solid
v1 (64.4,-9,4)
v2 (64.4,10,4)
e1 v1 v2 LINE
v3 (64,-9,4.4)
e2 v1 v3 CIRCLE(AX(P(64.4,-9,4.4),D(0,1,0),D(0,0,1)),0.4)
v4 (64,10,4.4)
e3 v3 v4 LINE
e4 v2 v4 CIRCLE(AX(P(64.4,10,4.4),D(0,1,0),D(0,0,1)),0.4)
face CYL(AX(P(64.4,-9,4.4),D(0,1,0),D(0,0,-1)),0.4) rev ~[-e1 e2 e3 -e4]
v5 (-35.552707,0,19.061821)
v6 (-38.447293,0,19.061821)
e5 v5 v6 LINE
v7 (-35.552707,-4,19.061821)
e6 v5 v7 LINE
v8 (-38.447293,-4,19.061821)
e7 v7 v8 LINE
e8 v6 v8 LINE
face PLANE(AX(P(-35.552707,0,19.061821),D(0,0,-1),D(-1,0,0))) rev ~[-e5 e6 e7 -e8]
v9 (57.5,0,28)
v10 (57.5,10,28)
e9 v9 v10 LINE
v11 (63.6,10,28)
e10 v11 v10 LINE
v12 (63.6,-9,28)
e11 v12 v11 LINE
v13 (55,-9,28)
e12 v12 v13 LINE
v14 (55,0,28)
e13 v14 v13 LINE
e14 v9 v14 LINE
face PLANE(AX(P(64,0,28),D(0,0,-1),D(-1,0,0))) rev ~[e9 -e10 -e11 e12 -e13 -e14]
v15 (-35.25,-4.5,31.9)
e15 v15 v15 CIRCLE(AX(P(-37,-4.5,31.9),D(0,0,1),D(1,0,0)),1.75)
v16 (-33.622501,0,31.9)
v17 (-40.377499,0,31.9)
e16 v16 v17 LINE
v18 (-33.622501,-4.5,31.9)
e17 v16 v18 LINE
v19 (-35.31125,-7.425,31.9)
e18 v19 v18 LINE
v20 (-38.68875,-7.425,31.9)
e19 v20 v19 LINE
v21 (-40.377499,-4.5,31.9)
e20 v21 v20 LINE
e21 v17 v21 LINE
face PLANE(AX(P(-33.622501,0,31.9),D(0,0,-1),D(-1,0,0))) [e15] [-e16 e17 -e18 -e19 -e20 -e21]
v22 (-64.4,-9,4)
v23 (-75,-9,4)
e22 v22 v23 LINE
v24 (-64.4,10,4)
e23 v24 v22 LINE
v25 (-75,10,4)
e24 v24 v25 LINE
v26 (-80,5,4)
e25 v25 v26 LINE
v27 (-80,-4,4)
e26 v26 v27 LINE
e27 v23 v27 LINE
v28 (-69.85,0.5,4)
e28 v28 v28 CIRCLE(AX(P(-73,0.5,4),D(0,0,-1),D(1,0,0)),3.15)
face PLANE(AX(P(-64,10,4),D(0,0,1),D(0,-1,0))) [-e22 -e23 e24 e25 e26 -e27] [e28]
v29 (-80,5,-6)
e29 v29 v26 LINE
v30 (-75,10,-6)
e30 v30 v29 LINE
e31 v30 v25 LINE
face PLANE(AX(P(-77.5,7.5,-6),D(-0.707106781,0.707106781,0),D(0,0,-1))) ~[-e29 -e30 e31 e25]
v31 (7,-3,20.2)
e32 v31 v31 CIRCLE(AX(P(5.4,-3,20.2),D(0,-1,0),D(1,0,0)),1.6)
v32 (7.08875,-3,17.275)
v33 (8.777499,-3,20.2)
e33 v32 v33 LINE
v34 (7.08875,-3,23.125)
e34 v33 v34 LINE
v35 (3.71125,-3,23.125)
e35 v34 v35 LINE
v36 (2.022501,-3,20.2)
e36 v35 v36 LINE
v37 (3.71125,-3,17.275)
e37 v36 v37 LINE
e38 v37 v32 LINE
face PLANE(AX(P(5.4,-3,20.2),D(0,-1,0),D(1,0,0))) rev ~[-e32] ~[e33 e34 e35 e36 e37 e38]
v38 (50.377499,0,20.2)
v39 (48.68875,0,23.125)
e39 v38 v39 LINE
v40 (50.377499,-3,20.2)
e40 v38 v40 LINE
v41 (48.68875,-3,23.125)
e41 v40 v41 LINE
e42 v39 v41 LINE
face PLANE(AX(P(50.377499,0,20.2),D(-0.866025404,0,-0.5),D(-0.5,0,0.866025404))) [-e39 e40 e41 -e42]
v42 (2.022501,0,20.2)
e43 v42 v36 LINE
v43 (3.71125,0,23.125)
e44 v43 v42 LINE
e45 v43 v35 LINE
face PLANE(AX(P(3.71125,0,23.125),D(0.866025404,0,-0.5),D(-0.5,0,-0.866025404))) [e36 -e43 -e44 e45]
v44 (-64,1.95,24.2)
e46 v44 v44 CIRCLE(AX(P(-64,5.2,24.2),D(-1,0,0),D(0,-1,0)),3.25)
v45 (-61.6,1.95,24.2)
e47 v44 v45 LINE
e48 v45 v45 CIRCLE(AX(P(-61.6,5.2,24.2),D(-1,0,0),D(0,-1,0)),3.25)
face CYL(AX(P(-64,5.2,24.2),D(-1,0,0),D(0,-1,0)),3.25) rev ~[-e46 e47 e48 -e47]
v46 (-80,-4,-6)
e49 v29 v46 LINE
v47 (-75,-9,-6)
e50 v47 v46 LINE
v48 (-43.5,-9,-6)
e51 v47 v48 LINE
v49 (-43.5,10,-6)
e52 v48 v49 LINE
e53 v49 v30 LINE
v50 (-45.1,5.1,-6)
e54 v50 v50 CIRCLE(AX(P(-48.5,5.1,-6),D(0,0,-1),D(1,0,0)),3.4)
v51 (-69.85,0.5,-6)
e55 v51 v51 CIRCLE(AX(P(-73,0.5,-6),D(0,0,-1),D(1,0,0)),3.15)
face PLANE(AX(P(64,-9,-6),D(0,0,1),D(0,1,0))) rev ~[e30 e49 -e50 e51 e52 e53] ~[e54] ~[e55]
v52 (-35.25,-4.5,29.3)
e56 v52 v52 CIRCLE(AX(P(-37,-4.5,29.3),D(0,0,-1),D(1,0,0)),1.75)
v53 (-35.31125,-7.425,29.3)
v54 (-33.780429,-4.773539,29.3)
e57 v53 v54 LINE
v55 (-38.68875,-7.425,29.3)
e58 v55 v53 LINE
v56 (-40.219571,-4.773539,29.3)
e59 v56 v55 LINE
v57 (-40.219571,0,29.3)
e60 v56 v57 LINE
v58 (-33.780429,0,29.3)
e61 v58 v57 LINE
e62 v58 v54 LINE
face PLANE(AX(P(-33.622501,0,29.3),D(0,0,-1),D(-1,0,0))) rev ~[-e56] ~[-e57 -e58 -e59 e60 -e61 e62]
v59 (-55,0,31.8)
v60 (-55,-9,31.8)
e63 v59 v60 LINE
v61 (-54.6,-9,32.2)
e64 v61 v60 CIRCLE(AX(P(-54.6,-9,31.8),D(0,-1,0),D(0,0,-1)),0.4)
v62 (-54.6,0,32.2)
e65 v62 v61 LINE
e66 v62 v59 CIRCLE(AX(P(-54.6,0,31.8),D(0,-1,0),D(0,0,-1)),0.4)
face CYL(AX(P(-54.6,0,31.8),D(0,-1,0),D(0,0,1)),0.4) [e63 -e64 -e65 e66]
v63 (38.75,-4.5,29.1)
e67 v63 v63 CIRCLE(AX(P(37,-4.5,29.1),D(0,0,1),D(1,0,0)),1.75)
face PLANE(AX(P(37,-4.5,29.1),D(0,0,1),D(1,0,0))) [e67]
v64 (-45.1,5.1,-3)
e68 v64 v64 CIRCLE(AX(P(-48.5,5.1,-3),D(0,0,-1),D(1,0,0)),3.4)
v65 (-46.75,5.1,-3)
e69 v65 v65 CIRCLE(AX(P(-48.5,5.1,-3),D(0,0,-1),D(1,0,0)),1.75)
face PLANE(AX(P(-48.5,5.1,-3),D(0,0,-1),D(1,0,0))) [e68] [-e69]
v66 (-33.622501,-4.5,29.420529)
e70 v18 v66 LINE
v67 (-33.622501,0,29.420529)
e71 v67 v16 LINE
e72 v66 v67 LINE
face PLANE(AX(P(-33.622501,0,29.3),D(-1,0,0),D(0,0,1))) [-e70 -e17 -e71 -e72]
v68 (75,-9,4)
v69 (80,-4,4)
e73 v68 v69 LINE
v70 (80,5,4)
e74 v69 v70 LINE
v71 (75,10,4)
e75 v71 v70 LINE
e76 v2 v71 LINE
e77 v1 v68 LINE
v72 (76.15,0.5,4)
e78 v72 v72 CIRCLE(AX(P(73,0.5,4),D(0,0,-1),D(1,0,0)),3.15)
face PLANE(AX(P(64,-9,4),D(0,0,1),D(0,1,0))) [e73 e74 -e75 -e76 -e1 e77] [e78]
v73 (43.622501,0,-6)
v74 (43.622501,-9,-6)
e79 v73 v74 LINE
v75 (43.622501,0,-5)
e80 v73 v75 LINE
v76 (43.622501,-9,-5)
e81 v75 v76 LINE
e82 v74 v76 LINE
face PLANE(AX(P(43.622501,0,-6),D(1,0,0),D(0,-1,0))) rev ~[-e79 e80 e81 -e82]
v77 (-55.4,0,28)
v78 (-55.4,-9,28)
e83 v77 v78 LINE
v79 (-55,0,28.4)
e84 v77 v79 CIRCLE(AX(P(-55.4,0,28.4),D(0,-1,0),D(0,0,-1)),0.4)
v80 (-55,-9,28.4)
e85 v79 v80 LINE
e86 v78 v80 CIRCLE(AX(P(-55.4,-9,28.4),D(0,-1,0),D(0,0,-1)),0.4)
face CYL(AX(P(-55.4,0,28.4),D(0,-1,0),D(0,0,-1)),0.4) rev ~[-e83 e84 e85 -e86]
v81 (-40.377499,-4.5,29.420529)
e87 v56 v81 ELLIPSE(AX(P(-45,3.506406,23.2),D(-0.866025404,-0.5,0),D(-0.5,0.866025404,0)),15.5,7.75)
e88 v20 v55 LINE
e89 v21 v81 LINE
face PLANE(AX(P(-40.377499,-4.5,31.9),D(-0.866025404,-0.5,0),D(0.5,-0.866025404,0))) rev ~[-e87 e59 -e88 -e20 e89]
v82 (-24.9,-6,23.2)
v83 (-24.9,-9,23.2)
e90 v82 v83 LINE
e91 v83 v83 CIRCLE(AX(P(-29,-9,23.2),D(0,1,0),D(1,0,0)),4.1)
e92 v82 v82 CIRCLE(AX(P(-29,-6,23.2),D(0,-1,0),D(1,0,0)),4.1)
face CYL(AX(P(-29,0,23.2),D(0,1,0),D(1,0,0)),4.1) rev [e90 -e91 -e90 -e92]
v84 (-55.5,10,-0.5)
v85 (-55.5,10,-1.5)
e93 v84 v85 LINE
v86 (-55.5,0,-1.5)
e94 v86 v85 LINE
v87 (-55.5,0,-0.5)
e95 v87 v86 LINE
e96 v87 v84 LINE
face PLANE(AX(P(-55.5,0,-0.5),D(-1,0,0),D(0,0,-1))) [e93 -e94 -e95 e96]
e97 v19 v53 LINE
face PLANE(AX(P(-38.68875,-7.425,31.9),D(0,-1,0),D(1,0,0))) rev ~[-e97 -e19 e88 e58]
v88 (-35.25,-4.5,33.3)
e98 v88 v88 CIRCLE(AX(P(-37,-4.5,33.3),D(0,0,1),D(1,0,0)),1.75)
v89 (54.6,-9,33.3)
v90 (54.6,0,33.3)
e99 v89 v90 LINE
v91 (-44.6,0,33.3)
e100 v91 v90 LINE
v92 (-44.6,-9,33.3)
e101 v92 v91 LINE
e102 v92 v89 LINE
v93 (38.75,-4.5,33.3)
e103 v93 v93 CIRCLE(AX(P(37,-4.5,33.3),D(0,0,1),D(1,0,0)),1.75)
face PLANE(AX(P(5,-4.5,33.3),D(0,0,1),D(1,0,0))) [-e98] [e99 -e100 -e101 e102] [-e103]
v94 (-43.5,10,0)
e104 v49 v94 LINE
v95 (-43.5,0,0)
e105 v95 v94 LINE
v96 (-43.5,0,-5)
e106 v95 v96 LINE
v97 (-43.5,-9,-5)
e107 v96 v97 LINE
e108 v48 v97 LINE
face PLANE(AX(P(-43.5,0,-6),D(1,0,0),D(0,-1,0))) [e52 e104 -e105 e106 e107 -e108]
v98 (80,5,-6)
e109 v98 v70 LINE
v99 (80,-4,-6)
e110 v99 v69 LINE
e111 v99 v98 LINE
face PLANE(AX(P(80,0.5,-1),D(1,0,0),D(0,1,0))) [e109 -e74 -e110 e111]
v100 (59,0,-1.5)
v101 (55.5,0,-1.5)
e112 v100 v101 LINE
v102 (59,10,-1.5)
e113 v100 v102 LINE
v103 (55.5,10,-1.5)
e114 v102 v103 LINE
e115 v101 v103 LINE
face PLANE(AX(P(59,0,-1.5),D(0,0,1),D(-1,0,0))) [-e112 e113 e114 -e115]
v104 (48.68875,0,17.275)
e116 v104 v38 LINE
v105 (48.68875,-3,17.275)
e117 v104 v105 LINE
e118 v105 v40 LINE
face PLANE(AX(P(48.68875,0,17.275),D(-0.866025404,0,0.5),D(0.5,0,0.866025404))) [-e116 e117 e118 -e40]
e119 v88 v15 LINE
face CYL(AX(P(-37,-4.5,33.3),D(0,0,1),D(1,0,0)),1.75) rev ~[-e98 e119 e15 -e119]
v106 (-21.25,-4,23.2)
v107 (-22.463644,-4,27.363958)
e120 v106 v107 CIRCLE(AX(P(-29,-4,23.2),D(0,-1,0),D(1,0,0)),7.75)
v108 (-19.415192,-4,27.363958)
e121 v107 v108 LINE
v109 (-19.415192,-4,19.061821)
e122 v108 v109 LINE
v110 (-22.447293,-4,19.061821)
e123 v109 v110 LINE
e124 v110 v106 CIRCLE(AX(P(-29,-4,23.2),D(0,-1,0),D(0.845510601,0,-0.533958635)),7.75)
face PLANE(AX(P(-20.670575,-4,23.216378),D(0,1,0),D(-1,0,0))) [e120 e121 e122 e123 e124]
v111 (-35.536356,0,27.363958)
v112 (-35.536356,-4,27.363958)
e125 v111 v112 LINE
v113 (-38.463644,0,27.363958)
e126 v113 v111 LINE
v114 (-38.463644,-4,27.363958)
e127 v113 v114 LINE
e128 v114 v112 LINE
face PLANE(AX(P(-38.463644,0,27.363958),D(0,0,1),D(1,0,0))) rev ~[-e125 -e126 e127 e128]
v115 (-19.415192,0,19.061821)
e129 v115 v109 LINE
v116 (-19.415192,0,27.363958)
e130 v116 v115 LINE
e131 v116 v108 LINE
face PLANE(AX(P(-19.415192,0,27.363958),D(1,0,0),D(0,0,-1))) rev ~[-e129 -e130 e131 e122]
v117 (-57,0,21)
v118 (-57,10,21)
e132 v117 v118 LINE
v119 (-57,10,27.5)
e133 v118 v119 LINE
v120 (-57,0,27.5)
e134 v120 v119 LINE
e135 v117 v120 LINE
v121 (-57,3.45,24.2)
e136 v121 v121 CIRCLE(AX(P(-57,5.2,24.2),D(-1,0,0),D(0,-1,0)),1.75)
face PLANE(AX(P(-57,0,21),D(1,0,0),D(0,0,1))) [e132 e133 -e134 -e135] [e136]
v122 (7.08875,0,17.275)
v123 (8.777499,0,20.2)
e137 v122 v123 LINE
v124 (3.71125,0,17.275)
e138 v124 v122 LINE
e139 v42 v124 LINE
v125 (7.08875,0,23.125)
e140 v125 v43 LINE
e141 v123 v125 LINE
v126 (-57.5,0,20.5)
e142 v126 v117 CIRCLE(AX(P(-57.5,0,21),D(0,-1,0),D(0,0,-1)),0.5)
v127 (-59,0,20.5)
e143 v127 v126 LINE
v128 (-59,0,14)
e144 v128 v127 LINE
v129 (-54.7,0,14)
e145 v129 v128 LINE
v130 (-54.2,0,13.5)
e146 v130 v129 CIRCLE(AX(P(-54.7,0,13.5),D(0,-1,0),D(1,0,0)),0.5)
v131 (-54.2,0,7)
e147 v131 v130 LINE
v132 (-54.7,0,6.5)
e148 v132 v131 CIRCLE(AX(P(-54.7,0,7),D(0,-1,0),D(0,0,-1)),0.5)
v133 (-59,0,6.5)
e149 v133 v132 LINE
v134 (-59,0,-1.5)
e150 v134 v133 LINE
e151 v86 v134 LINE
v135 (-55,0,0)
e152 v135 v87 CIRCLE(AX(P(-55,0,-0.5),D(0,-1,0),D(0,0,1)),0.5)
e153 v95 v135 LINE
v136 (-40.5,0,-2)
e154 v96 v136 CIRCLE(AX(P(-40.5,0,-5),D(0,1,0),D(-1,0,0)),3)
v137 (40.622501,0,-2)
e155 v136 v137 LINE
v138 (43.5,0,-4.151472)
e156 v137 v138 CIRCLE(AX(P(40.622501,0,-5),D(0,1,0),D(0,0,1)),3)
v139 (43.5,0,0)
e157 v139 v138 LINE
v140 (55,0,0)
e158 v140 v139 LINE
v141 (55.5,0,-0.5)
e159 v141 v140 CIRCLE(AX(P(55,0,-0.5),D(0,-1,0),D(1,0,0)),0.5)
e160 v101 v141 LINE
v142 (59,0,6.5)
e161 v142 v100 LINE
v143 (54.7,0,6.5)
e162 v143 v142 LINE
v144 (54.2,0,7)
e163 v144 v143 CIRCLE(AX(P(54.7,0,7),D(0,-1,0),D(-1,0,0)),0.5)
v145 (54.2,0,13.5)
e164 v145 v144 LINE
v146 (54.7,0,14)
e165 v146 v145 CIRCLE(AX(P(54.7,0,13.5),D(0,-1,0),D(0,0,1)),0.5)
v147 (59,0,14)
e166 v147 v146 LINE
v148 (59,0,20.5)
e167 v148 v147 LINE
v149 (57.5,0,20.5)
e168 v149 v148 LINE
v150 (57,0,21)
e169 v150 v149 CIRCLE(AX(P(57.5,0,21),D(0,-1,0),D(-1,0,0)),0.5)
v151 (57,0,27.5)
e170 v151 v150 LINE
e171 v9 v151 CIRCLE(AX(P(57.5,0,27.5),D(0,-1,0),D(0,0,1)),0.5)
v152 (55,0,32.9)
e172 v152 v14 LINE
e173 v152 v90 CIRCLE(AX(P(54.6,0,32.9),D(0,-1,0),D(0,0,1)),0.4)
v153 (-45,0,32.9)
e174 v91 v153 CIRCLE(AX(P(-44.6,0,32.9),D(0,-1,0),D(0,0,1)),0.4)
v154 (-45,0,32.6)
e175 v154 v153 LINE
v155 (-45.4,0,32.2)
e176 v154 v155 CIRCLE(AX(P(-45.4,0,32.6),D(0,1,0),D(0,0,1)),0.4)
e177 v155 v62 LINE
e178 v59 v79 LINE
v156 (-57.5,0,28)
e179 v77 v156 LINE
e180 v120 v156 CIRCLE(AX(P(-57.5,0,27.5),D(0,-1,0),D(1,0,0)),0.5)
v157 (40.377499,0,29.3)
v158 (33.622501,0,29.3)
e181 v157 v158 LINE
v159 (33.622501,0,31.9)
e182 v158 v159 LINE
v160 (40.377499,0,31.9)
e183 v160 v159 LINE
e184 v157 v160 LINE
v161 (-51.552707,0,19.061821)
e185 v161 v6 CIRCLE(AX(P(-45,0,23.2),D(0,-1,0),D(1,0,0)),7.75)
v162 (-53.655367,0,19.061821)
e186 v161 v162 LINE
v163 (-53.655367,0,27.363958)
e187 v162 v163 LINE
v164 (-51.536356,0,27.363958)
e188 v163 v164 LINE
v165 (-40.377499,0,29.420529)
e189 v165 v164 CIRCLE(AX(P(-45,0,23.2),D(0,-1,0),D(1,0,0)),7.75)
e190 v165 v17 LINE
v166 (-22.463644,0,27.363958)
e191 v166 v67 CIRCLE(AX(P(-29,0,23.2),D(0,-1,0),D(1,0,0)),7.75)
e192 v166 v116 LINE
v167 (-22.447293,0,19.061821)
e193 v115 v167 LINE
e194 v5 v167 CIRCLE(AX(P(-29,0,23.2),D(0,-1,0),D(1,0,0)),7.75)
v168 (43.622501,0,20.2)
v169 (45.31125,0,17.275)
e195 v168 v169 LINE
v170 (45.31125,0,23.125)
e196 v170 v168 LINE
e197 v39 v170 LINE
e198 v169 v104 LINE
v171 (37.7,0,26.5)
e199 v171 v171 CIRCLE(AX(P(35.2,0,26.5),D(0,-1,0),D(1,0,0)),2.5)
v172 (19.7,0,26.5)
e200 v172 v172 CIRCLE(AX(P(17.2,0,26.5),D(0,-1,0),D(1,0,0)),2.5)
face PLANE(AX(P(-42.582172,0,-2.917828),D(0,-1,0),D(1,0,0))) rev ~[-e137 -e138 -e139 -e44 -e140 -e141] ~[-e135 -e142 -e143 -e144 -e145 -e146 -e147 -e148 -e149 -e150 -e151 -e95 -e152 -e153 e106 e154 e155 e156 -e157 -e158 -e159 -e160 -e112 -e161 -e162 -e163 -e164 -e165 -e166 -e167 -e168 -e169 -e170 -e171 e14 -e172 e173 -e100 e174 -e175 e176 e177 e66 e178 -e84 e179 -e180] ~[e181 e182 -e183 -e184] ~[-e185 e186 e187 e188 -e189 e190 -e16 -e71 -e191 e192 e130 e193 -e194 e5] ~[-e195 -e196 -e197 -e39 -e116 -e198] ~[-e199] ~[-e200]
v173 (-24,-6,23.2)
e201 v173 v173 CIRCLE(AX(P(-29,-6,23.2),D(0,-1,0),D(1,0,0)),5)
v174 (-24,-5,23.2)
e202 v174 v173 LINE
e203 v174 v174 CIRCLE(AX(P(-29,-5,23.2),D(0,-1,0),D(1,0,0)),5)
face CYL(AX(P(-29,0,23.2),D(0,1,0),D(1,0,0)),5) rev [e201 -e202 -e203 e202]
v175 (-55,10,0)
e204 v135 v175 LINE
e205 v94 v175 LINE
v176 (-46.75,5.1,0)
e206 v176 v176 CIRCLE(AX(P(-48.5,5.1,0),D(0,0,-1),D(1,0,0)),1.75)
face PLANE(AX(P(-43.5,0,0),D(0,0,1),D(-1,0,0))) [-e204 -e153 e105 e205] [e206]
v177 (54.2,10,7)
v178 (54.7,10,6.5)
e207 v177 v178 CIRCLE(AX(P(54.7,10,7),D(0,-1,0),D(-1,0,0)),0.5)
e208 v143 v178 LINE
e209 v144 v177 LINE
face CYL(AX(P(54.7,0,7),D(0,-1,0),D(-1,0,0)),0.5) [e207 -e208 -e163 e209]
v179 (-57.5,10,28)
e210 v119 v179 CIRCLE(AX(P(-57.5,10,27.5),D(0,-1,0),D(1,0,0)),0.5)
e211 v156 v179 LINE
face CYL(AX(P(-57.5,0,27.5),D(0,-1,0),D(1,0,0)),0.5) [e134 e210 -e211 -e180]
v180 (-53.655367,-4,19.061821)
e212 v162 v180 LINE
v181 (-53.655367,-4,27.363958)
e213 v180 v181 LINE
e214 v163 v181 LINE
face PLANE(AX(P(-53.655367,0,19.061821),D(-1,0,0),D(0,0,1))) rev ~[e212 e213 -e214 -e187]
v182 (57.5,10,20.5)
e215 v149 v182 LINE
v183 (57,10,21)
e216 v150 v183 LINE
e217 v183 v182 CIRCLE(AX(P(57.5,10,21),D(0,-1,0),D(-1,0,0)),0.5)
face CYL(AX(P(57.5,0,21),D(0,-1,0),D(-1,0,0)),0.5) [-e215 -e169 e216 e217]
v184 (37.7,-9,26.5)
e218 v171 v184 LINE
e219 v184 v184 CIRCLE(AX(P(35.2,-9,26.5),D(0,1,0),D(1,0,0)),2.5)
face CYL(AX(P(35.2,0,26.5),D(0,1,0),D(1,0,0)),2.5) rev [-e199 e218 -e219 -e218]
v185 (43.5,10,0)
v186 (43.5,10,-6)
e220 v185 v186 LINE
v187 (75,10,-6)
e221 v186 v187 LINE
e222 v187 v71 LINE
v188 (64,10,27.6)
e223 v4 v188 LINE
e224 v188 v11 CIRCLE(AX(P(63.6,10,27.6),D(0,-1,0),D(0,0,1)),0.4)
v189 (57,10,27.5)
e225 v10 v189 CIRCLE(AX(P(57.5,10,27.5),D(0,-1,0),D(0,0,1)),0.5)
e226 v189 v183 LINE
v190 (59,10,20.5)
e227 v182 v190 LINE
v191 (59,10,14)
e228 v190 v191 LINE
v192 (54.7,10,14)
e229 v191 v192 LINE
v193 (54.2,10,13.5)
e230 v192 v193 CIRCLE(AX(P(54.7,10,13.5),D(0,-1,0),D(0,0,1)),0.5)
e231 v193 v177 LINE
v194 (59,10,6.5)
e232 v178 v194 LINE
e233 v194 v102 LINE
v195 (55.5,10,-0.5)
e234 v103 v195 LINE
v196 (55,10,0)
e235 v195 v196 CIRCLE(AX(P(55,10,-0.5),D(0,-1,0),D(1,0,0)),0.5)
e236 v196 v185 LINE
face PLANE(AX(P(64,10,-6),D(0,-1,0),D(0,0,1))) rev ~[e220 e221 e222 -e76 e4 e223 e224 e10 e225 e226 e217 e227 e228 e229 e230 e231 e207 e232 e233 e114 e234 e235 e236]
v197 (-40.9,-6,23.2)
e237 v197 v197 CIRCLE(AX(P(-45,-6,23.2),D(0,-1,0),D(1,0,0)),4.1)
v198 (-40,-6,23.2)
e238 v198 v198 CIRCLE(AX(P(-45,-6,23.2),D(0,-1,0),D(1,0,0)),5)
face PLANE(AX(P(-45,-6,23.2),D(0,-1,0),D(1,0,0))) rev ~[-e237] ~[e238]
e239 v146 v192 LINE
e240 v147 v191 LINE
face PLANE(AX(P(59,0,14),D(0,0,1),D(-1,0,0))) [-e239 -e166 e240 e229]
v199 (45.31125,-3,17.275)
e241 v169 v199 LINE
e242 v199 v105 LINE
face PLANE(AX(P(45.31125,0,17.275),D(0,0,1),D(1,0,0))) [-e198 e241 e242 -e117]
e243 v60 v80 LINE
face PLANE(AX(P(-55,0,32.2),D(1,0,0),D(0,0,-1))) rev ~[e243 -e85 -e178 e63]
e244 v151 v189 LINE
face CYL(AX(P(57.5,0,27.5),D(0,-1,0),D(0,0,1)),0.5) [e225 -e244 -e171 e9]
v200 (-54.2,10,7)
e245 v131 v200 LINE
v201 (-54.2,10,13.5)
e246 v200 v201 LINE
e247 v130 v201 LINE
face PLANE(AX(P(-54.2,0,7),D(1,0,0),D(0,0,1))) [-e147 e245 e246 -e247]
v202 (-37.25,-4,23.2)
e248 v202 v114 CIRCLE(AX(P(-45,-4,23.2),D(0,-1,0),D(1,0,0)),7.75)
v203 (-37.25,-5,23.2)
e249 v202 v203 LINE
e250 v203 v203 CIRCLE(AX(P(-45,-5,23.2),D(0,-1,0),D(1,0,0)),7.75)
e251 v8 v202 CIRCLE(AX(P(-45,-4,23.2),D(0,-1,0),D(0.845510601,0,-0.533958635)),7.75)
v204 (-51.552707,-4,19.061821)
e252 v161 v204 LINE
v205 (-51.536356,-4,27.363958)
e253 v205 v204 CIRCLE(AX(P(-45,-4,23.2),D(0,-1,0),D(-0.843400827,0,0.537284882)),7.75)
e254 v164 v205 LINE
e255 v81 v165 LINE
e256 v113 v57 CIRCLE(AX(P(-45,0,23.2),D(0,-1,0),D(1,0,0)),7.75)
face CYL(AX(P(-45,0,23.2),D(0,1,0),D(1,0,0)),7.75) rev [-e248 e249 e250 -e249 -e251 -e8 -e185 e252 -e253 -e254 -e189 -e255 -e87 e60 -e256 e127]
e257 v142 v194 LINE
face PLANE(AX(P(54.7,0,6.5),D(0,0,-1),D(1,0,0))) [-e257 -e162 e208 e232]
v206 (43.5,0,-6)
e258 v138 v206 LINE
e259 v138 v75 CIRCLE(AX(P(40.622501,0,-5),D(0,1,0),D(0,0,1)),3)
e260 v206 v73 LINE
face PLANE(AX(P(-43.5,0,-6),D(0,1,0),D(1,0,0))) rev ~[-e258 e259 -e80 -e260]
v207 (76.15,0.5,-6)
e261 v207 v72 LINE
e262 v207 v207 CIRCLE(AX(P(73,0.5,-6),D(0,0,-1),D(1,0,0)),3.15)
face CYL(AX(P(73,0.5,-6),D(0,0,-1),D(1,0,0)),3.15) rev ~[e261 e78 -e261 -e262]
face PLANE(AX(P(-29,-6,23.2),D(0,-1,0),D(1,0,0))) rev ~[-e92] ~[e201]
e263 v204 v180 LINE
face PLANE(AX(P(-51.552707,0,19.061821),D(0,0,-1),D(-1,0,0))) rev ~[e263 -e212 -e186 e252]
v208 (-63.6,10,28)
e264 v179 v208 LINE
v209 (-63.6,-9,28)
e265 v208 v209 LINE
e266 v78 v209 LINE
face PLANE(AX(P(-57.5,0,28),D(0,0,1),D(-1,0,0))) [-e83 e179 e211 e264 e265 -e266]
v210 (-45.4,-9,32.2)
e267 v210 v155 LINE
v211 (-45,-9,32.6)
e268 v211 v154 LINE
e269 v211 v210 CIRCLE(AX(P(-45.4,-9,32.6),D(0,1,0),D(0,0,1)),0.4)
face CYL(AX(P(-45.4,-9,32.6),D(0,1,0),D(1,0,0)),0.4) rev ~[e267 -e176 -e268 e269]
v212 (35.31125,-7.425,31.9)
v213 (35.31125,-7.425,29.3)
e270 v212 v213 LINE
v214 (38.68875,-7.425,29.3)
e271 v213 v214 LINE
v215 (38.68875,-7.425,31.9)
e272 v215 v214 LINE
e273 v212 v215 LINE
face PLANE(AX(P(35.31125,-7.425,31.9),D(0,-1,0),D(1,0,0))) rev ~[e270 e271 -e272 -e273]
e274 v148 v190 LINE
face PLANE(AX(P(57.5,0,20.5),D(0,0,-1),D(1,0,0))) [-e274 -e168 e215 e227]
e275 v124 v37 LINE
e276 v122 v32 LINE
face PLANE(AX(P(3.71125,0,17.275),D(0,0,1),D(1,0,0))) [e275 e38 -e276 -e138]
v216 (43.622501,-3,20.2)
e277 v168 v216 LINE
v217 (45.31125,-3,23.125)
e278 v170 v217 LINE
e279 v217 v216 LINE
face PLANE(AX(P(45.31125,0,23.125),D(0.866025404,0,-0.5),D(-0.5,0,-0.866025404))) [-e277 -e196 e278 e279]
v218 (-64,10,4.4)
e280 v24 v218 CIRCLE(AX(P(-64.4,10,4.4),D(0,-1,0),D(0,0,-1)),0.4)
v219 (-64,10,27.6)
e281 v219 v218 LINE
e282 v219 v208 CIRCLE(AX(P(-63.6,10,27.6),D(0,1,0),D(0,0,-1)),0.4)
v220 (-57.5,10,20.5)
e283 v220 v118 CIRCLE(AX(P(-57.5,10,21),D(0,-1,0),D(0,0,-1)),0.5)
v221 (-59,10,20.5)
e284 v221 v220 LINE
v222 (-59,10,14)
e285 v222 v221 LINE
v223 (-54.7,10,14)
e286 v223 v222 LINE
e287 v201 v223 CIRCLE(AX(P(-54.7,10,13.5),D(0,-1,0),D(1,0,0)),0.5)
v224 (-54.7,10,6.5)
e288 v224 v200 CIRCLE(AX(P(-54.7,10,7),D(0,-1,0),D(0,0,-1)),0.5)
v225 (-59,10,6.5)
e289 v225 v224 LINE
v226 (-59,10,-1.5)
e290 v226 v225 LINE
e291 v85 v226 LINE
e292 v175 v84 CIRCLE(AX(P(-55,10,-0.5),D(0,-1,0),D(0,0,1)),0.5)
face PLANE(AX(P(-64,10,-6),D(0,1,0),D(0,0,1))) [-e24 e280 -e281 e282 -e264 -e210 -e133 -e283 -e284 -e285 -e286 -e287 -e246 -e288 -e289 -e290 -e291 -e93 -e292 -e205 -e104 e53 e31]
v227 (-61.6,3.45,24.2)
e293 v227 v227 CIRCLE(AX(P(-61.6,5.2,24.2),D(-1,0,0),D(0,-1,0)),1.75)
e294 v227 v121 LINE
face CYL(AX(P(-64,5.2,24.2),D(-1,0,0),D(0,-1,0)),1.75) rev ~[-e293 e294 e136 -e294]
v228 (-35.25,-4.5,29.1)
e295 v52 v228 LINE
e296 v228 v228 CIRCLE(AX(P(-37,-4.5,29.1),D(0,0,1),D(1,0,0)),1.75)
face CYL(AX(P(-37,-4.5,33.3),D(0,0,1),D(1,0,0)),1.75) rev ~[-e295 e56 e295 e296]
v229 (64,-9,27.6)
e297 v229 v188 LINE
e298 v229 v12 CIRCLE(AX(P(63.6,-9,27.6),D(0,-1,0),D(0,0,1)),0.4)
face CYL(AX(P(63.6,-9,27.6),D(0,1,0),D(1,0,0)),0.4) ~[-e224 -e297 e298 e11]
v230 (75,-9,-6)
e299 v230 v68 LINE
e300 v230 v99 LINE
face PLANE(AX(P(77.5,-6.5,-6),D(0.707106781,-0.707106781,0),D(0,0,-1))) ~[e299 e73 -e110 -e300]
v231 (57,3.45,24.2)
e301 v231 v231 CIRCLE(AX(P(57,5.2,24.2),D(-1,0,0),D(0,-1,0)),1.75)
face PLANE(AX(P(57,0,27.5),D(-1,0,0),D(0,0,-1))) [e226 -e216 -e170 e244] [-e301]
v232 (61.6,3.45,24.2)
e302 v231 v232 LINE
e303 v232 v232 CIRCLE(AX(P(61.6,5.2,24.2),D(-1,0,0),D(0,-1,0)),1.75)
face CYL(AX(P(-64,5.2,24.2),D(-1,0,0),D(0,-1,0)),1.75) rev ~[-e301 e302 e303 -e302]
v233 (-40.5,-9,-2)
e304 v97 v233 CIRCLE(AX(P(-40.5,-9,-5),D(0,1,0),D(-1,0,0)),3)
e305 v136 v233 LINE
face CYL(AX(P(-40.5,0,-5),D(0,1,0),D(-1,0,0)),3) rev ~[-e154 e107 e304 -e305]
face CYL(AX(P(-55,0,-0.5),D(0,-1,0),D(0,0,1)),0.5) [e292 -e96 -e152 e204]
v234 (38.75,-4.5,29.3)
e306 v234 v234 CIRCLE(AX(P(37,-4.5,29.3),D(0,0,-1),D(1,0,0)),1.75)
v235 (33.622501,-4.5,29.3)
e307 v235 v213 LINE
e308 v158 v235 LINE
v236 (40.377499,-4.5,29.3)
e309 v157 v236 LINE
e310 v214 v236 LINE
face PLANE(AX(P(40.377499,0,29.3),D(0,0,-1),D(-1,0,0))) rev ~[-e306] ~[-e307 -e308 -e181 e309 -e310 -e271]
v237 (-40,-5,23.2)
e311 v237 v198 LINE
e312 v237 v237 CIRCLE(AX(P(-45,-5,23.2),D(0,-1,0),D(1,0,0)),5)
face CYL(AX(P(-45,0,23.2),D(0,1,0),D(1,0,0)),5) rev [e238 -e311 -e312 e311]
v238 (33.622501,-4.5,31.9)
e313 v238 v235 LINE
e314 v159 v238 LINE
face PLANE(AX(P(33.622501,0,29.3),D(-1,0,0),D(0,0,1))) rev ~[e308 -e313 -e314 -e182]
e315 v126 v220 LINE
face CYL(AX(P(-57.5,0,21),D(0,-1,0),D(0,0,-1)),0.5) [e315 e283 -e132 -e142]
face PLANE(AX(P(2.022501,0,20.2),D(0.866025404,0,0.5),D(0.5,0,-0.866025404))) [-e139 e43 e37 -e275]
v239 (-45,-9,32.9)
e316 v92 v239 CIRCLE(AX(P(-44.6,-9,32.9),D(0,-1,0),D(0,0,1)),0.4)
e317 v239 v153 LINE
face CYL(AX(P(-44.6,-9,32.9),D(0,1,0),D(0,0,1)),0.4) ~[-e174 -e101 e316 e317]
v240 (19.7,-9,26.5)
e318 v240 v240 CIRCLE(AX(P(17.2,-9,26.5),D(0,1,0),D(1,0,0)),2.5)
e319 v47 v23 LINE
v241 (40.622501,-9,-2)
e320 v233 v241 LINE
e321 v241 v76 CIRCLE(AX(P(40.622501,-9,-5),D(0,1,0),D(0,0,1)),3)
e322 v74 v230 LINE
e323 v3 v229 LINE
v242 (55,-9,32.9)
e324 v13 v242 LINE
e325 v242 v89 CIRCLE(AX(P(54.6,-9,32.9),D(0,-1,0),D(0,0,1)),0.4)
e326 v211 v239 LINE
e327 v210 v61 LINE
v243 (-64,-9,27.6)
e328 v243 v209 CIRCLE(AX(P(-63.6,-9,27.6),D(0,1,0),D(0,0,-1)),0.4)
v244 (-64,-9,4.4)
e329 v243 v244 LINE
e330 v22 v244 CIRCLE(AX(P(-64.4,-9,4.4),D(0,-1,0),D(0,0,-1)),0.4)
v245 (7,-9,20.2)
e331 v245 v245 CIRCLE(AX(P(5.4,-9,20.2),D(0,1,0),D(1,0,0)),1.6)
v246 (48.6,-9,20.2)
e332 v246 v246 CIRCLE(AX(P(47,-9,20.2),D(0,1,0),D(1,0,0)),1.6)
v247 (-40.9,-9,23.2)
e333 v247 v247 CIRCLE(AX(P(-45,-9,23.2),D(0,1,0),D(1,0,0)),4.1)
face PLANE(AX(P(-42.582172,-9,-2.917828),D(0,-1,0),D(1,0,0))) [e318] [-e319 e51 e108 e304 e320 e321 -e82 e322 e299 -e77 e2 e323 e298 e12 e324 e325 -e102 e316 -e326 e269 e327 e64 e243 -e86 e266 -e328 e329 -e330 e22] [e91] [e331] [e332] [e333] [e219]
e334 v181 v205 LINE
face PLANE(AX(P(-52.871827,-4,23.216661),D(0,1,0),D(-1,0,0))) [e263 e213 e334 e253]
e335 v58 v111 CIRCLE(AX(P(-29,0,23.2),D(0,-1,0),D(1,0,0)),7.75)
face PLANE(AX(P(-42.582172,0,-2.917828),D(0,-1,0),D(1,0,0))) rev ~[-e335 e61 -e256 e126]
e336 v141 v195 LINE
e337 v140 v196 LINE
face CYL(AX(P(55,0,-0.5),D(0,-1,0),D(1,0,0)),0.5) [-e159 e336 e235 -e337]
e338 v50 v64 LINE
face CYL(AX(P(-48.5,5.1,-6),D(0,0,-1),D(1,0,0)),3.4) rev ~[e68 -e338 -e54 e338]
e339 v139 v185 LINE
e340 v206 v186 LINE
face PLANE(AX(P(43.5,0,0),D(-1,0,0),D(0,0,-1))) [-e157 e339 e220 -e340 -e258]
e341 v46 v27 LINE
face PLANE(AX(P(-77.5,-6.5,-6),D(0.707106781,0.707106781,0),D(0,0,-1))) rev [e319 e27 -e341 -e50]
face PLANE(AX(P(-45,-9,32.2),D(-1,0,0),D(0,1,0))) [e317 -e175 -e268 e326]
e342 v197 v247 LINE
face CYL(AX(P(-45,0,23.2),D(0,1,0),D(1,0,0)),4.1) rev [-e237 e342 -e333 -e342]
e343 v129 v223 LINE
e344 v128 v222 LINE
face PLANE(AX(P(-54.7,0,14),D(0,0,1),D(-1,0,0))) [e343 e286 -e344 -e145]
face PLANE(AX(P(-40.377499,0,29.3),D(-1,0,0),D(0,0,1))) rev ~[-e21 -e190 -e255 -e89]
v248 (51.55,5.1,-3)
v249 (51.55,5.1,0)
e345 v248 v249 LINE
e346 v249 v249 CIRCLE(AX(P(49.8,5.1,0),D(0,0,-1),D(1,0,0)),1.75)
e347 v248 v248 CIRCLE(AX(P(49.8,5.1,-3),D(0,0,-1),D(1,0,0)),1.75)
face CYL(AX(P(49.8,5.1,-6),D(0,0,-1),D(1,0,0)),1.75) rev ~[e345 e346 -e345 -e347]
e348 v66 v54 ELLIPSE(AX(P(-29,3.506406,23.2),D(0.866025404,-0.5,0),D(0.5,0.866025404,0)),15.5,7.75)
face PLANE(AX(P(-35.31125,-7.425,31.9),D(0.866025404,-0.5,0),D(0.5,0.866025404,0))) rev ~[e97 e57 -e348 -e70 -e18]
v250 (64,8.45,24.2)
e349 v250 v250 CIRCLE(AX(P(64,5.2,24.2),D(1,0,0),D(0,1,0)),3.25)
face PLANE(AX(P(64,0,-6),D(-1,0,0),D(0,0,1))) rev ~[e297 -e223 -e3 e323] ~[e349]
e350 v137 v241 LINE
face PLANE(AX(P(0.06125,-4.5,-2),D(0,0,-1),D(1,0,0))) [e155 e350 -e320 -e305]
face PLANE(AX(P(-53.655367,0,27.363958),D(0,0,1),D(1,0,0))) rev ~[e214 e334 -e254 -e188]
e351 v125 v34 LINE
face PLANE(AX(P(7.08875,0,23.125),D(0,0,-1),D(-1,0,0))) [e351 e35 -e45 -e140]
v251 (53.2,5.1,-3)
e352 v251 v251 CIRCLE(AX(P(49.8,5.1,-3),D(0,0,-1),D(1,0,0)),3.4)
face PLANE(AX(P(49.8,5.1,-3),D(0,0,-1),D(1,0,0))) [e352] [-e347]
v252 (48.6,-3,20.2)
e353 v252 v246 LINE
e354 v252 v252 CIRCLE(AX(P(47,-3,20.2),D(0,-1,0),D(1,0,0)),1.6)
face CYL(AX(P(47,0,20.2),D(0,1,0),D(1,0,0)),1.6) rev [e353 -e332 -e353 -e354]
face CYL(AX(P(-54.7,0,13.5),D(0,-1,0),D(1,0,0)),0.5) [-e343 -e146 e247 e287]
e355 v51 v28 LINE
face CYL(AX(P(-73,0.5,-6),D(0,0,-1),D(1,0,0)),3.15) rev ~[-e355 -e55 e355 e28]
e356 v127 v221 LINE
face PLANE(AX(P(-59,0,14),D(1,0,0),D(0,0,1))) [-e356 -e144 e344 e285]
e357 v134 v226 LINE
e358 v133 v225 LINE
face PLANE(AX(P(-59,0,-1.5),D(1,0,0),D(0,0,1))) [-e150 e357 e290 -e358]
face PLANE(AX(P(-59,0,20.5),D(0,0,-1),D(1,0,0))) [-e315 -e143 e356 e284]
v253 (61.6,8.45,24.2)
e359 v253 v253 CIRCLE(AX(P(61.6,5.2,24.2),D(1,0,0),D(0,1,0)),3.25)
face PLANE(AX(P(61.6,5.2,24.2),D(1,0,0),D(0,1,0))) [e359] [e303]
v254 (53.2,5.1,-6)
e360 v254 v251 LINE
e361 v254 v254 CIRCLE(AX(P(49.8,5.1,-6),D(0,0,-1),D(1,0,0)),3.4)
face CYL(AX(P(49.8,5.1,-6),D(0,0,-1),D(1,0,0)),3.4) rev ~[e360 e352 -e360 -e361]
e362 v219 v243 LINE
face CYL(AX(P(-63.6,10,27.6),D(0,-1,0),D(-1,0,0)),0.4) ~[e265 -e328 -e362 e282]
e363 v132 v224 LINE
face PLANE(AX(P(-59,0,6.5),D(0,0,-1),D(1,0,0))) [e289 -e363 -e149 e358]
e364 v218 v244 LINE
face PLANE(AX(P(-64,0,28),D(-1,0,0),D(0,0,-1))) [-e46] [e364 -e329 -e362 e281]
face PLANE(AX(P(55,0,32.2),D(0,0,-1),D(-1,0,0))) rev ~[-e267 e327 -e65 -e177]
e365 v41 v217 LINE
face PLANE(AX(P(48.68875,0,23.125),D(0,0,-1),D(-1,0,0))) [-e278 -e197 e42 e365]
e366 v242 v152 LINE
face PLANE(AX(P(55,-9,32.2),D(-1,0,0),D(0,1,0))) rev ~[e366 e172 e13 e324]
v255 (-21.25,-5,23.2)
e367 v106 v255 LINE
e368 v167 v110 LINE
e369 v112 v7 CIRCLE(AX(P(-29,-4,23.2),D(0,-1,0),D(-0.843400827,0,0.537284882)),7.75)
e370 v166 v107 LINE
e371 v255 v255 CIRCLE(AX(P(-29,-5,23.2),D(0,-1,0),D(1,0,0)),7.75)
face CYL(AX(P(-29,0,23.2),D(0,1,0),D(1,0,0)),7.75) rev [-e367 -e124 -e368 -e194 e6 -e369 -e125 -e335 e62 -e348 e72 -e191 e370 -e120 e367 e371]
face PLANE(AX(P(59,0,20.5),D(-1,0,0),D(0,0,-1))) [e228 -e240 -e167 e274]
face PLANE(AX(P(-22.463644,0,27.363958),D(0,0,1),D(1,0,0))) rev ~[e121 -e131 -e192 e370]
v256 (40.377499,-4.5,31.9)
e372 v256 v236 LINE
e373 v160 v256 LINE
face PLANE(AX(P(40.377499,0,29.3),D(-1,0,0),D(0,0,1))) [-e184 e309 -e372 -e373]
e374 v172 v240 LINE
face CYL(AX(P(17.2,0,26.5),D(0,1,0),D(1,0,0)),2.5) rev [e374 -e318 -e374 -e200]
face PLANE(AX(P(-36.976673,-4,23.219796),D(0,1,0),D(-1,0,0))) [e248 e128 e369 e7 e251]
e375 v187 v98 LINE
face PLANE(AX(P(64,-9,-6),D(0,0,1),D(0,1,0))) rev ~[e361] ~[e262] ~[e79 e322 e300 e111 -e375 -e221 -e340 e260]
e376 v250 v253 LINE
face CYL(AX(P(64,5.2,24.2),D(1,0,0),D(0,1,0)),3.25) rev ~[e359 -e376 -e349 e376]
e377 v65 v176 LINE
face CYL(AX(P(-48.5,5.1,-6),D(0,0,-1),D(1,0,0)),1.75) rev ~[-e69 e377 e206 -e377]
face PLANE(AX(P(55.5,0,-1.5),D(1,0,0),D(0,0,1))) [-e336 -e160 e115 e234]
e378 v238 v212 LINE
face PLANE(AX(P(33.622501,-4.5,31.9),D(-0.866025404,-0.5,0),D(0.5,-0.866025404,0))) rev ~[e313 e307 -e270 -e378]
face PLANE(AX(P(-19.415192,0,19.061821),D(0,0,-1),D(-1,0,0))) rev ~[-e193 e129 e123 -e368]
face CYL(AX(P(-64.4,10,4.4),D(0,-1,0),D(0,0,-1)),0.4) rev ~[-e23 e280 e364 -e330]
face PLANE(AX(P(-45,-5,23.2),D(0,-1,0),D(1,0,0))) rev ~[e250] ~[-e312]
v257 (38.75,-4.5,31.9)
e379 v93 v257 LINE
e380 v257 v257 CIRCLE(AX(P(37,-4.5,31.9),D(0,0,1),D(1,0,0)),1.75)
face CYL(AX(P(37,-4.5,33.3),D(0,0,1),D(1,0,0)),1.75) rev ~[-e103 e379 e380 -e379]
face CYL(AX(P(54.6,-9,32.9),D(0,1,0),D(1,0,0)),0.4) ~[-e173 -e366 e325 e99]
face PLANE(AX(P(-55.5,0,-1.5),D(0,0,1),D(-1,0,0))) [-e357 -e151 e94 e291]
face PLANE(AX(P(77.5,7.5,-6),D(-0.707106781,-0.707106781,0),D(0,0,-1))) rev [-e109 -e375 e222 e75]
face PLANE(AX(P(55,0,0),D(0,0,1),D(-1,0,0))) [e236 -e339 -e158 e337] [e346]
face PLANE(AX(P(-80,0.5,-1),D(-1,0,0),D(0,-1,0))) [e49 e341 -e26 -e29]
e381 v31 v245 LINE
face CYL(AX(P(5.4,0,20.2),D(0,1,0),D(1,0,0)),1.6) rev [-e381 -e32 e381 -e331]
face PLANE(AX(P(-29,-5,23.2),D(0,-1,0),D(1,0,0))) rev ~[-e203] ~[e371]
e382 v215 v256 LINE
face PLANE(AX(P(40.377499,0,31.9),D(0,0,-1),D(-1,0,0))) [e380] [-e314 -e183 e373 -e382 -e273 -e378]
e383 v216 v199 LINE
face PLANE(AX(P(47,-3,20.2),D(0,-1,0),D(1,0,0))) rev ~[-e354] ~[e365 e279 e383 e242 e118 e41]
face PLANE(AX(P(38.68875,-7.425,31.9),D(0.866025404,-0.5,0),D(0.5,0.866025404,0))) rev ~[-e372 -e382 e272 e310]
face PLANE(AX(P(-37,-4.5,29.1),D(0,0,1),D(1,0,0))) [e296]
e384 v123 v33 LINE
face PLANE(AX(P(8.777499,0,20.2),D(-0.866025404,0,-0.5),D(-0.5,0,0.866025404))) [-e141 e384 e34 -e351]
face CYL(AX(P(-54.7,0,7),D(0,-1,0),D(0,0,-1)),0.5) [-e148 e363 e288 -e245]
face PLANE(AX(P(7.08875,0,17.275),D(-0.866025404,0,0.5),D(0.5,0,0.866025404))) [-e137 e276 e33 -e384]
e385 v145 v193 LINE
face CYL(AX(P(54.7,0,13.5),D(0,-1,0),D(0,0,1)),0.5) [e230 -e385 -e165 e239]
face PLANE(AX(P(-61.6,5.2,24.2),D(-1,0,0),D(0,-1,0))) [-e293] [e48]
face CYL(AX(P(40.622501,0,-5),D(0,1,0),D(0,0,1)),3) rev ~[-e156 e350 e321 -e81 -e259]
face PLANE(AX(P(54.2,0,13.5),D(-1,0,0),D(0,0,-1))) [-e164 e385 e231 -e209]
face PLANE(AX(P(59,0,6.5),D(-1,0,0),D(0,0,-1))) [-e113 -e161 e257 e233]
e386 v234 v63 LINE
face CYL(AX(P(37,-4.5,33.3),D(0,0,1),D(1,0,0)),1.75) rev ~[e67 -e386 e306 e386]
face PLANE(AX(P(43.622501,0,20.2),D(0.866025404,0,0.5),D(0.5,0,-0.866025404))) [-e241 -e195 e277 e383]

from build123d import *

# Parameters (mm, degrees)
F2_DEPTH     = 9
F3_DEPTH     = 10
F4_R         = 4.1
F4_R_2       = 2.5
F4_R_3       = 1.6
F5_DEPTH     = 24.8
F6_DEPTH     = 3
F4_R_4       = 5
F7_DEPTH     = 6
F4_R_5       = 7.75
F8_DEPTH     = 5
F9_R         = 1.75
F10_DEPTH    = 158.2
F9_R_2       = 3.25
F11_DEPTH    = 2.4
F12_R        = 3.25
F13_DEPTH    = 2.4
F14_R        = 3.4
F14_R_2      = 1.75
F15_DEPTH    = 3
F16_DEPTH    = 25
F17_W        = 100
F17_H        = 9
F18_DEPTH    = 1.1
F20_START    = -1.4
F19_R        = 1.75
F20_DEPTH    = 2.6
F21_DEPTH    = 4.2
F22_W        = 6.7549981495
F22_H        = 2.6
F23_DEPTH    = 4.5
F24_W        = 19
F24_H        = 10
F25_DEPTH    = 16
F26_SIZE     = 5
F27_W        = 19
F27_H        = 10
F28_DEPTH    = 16
F29_SIZE     = 5
F30_R        = 3.15
F31_DEPTH    = 25
F32_R        = 0.4
F33_W        = 87.1225009252
F33_H        = 9
F34_DEPTH    = 4
F35_T1_DEPTH = 9
F37_DEPTH    = 4


# Not quite as in the source:
# - a fillet or chamfer that OpenCascade refuses, or shapes differently, is made with other operations: its cross-section is extruded or revolved along the edge and cut away or added


with BuildPart() as f2:
    # F1 (on face) → F2 (new body)
    with BuildSketch(Plane.XZ):
        Polygon((-55, 28), (-64, 28), (-64, -6), (0, -6), (64, -6), (64, 28), (55, 28), (55, 32.2), (0, 32.2), (-55, 32.2), align=None)
    extrude(amount=F2_DEPTH)

    # F0 (on Front) → F3 (join)
    with BuildSketch(Plane.XZ):
        with BuildLine():
            Line((-57.5, 28), (-64, 28))
            Line((-64, 28), (-64, -6))
            Line((-64, -6), (-43.5, -6))
            Line((-43.5, -6), (-43.5, 0))
            Line((-43.5, 0), (-55, 0))
            ThreePointArc((-55, 0), (-55.3535533906, -0.1464466094), (-55.5, -0.5))
            Line((-55.5, -0.5), (-55.5, -1.5))
            Line((-55.5, -1.5), (-59, -1.5))
            Line((-59, -1.5), (-59, 6.5))
            Line((-59, 6.5), (-54.7, 6.5))
            ThreePointArc((-54.7, 6.5), (-54.3464466094, 6.6464466094), (-54.2, 7))
            Line((-54.2, 7), (-54.2, 13.5))
            ThreePointArc((-54.2, 13.5), (-54.3464466094, 13.8535533906), (-54.7, 14))
            Line((-54.7, 14), (-59, 14))
            Line((-59, 14), (-59, 20.5))
            Line((-59, 20.5), (-57.5, 20.5))
            ThreePointArc((-57.5, 20.5), (-57.1464466094, 20.6464466094), (-57, 21))
            Line((-57, 21), (-57, 27.5))
            ThreePointArc((-57, 27.5), (-57.1464466094, 27.8535533906), (-57.5, 28))
        make_face()
        with BuildLine():
            Line((43.5, -6), (64, -6))
            Line((64, -6), (64, 28))
            Line((64, 28), (57.5, 28))
            ThreePointArc((57.5, 28), (57.1464466094, 27.8535533906), (57, 27.5))
            Line((57, 27.5), (57, 21))
            ThreePointArc((57, 21), (57.1464466094, 20.6464466094), (57.5, 20.5))
            Line((57.5, 20.5), (59, 20.5))
            Line((59, 20.5), (59, 14))
            Line((59, 14), (54.7, 14))
            ThreePointArc((54.7, 14), (54.3464466094, 13.8535533906), (54.2, 13.5))
            Line((54.2, 13.5), (54.2, 7))
            ThreePointArc((54.2, 7), (54.3464466094, 6.6464466094), (54.7, 6.5))
            Line((54.7, 6.5), (59, 6.5))
            Line((59, 6.5), (59, -1.5))
            Line((59, -1.5), (55.5, -1.5))
            Line((55.5, -1.5), (55.5, -0.5))
            ThreePointArc((55.5, -0.5), (55.3535533906, -0.1464466094), (55, 0))
            Line((55, 0), (43.5, 0))
            Line((43.5, 0), (43.5, -6))
        make_face()
    extrude(amount=-F3_DEPTH)

    # F4 (on Front) → F5 (cut)
    with BuildSketch(Plane.XZ):
        with Locations((-29, 23.2)):
            Circle(F4_R)
        with Locations((-45, 23.2)):
            Circle(F4_R)
        with Locations((35.2, 26.5)):
            Circle(F4_R_2)
        with Locations((17.2, 26.5)):
            Circle(F4_R_2)
        with Locations((5.4, 20.2)):
            Circle(F4_R_3)
        with Locations((47, 20.2)):
            Circle(F4_R_3)
    extrude(amount=F5_DEPTH, mode=Mode.SUBTRACT)

    # F4 (on Front) → F6 (cut)
    with BuildSketch(Plane.XZ):
        Polygon((3.7112504626, 17.275), (7.0887495374, 17.275), (8.7774990748, 20.2), (7.0887495374, 23.125), (3.7112504626, 23.125), (2.0225009252, 20.2), align=None)
        with Locations((5.4, 20.2)):
            Circle(F4_R_3, mode=Mode.SUBTRACT)
        Polygon((45.3112504626, 17.275), (48.6887495374, 17.275), (50.3774990748, 20.2), (48.6887495374, 23.125), (45.3112504626, 23.125), (43.6225009252, 20.2), align=None)
        with Locations((47, 20.2)):
            Circle(F4_R_3, mode=Mode.SUBTRACT)
    extrude(amount=F6_DEPTH, mode=Mode.SUBTRACT)

    # F4 (on Front) → F7 (cut)
    with BuildSketch(Plane.XZ):
        with Locations((-45, 23.2)):
            Circle(F4_R_4)
        with Locations((-45, 23.2)):
            Circle(F4_R, mode=Mode.SUBTRACT)
        with Locations((-29, 23.2)):
            Circle(F4_R_4)
        with Locations((-29, 23.2)):
            Circle(F4_R, mode=Mode.SUBTRACT)
    extrude(amount=F7_DEPTH, mode=Mode.SUBTRACT)

    # F4 (on Front) → F8 (cut)
    with BuildSketch(Plane.XZ):
        with Locations((-29, 23.2)):
            Circle(F4_R_5)
        with Locations((-29, 23.2)):
            Circle(F4_R_4, mode=Mode.SUBTRACT)
        with Locations((-45, 23.2)):
            Circle(F4_R_5)
        with Locations((-45, 23.2)):
            Circle(F4_R_4, mode=Mode.SUBTRACT)
    extrude(amount=F8_DEPTH, mode=Mode.SUBTRACT)

    # F9 (on face) → F10 (cut)
    with BuildSketch(Plane(origin=(-64, 0, 0), x_dir=(0, -1, 0), z_dir=(-1, 0, 0))):
        with Locations((-5.2, 24.2)):
            Circle(F9_R)
    extrude(amount=-F10_DEPTH, mode=Mode.SUBTRACT)

    # F9 (on face) → F11 (cut)
    with BuildSketch(Plane(origin=(-64, 0, 0), x_dir=(0, -1, 0), z_dir=(-1, 0, 0))):
        with Locations((-5.2, 24.2)):
            Circle(F9_R_2)
        with Locations((-5.2, 24.2)):
            Circle(F9_R, mode=Mode.SUBTRACT)
    extrude(amount=-F11_DEPTH, mode=Mode.SUBTRACT)

    # F12 (on face) → F13 (cut)
    with BuildSketch(Plane.YZ.offset(64)):
        with Locations((5.2, 24.2)):
            Circle(F12_R)
    extrude(amount=-F13_DEPTH, mode=Mode.SUBTRACT)

    # F14 (on face) → F15 (cut)
    with BuildSketch(Plane(origin=(0, 0, -6), x_dir=(1, 0, 0), z_dir=(0, 0, -1))):
        with Locations((49.8, -5.1)):
            Circle(F14_R)
        with Locations((49.8, -5.1)):
            Circle(F14_R_2, mode=Mode.SUBTRACT)
        with Locations((-48.5, -5.1)):
            Circle(F14_R)
        with Locations((-48.5, -5.1)):
            Circle(F14_R_2, mode=Mode.SUBTRACT)
        with Locations((49.8, -5.1)):
            Circle(F14_R_2)
    extrude(amount=-F15_DEPTH, mode=Mode.SUBTRACT)

    # F14 (on face) → F16 (cut)
    with BuildSketch(Plane(origin=(0, 0, -6), x_dir=(1, 0, 0), z_dir=(0, 0, -1))):
        with Locations((49.8, -5.1)):
            Circle(F14_R_2)
        with Locations((-48.5, -5.1)):
            Circle(F14_R_2)
    extrude(amount=-F16_DEPTH, mode=Mode.SUBTRACT)

    # F17 (on face) → F18 (join)
    with BuildSketch(Plane.XY.offset(32.2)):
        with Locations((5, -4.5)):
            Rectangle(F17_W, F17_H)
    extrude(amount=F18_DEPTH)

    # F19 (on face) → F20 (cut)
    with BuildSketch(Plane.XY.offset(33.3).offset(F20_START)):
        Polygon((35.3112504626, -7.425), (38.6887495374, -7.425), (40.3774990748, -4.5), (38.6887495374, -1.575), (35.3112504626, -1.575), (33.6225009252, -4.5), align=None)
        with Locations((37, -4.5)):
            Circle(F19_R, mode=Mode.SUBTRACT)
        Polygon((-38.6887495374, -7.425), (-35.3112504626, -7.425), (-33.6225009252, -4.5), (-35.3112504626, -1.575), (-38.6887495374, -1.575), (-40.3774990748, -4.5), align=None)
        with Locations((-37, -4.5)):
            Circle(F19_R, mode=Mode.SUBTRACT)
    extrude(amount=-F20_DEPTH, mode=Mode.SUBTRACT)

    # F19 (on face) → F21 (cut)
    with BuildSketch(Plane.XY.offset(33.3)):
        with Locations((-37, -4.5)):
            Circle(F19_R)
        with Locations((37, -4.5)):
            Circle(F19_R)
    extrude(amount=-F21_DEPTH, mode=Mode.SUBTRACT)

    # F22 (on face) → F23 (cut)
    with BuildSketch(Plane(origin=(0, 0, 0), x_dir=(-1, 0, 0), z_dir=(0, 1, 0))):
        with Locations((-37, 30.6)):
            Rectangle(F22_W, F22_H)
        with Locations((37, 30.6)):
            Rectangle(F22_W, F22_H)
    extrude(amount=-F23_DEPTH, mode=Mode.SUBTRACT)

    # F24 (on face) → F25 (join)
    with BuildSketch(Plane(origin=(-64, 0, 0), x_dir=(0, -1, 0), z_dir=(-1, 0, 0))):
        with Locations((-0.5, -1)):
            Rectangle(F24_W, F24_H)
    extrude(amount=F25_DEPTH)

    # F26
    f26_edges = [f2.edges().sort_by_distance(p)[0] for p in [
        (-80, -9, -1),
        (-80, 10, -1),
    ]]
    chamfer(f26_edges, length=F26_SIZE)

    # F27 (on face) → F28 (join)
    with BuildSketch(Plane.YZ.offset(64)):
        with Locations((0.5, -1)):
            Rectangle(F27_W, F27_H)
    extrude(amount=F28_DEPTH)

    # F29
    f29_edges = [f2.edges().sort_by_distance(p)[0] for p in [
        (80, 10, -1),
        (80, -9, -1),
    ]]
    chamfer(f29_edges, length=F29_SIZE)

    # F30 (on face) → F31 (cut)
    with BuildSketch(Plane(origin=(0, 0, -6), x_dir=(1, 0, 0), z_dir=(0, 0, -1))):
        with Locations((-73, -0.5)):
            Circle(F30_R)
        with Locations((73, -0.5)):
            Circle(F30_R)
    extrude(amount=-F31_DEPTH, mode=Mode.SUBTRACT)

    # F32
    f32_edges = [f2.edges().sort_by_distance(p)[0] for p in [
        (64, 0.5, 28),
        (55, -4.5, 33.3),
        (-64, 0.5, 28),
        (-55, -4.5, 28),
        (-55, -4.5, 32.2),
        (-45, -4.5, 32.2),
        (-45, -4.5, 33.3),
        (-64, 0.5, 4),
        (64, 0.5, 4),
    ]]
    fillet(f32_edges, radius=F32_R)

    # F33 (on face) → F34 (cut)
    with BuildSketch(Plane(origin=(0, 0, -6), x_dir=(1, 0, 0), z_dir=(0, 0, -1))):
        with Locations((0.0612504626, 4.5)):
            Rectangle(F33_W, F33_H)
    extrude(amount=-F34_DEPTH, mode=Mode.SUBTRACT)

    # F35: fillet of radius 3 on 2 edges, made by hand

    # F35_s2 → F35_t1 (join)
    with BuildSketch(Plane.XZ):
        with BuildLine():
            ThreePointArc((-43.5, -5), (-42.6213203436, -2.8786796564), (-40.5, -2))
            Line((-40.5, -2), (-43.5, -2))
            Line((-43.5, -2), (-43.5, -5))
        make_face()
        with BuildLine():
            ThreePointArc((40.6225009252, -2), (42.7438212688, -2.8786796564), (43.6225009252, -5))
            Line((43.6225009252, -5), (43.6225009252, -2))
            Line((43.6225009252, -2), (40.6225009252, -2))
        make_face()
    extrude(amount=F35_T1_DEPTH)

    # F36 (on face) → F37 (cut)
    with BuildSketch(Plane(origin=(0, 0, 0), x_dir=(-1, 0, 0), z_dir=(0, 1, 0))):
        with BuildLine():
            Line((22.4636435891, 27.3639578372), (19.415192306, 27.3639578372))
            Line((19.415192306, 27.3639578372), (19.415192306, 19.0618205816))
            Line((19.415192306, 19.0618205816), (22.4472928418, 19.0618205816))
            ThreePointArc((22.4472928418, 19.0618205816), (21.5553381381, 21.0460478738), (21.25, 23.2))
            ThreePointArc((21.25, 23.2), (21.5595946957, 25.3686099022), (22.4636435891, 27.3639578372))
        make_face()
        with BuildLine():
            Line((38.4636435891, 27.3639578372), (35.5363564109, 27.3639578372))
            ThreePointArc((35.5363564109, 27.3639578372), (36.7499849698, 23.2152633041), (35.5527071582, 19.0618205816))
            Line((35.5527071582, 19.0618205816), (38.4472928418, 19.0618205816))
            ThreePointArc((38.4472928418, 19.0618205816), (37.5553381381, 21.0460478738), (37.25, 23.2))
            ThreePointArc((37.25, 23.2), (37.5595946957, 25.3686099022), (38.4636435891, 27.3639578372))
        make_face()
        with BuildLine():
            Line((53.6553673446, 27.3639578372), (51.5363564109, 27.3639578372))
            ThreePointArc((51.5363564109, 27.3639578372), (52.7499849698, 23.2152633041), (51.5527071582, 19.0618205816))
            Line((51.5527071582, 19.0618205816), (53.6553673446, 19.0618205816))
            Line((53.6553673446, 19.0618205816), (53.6553673446, 27.3639578372))
        make_face()
    extrude(amount=-F37_DEPTH, mode=Mode.SUBTRACT)


solid = f2.part
